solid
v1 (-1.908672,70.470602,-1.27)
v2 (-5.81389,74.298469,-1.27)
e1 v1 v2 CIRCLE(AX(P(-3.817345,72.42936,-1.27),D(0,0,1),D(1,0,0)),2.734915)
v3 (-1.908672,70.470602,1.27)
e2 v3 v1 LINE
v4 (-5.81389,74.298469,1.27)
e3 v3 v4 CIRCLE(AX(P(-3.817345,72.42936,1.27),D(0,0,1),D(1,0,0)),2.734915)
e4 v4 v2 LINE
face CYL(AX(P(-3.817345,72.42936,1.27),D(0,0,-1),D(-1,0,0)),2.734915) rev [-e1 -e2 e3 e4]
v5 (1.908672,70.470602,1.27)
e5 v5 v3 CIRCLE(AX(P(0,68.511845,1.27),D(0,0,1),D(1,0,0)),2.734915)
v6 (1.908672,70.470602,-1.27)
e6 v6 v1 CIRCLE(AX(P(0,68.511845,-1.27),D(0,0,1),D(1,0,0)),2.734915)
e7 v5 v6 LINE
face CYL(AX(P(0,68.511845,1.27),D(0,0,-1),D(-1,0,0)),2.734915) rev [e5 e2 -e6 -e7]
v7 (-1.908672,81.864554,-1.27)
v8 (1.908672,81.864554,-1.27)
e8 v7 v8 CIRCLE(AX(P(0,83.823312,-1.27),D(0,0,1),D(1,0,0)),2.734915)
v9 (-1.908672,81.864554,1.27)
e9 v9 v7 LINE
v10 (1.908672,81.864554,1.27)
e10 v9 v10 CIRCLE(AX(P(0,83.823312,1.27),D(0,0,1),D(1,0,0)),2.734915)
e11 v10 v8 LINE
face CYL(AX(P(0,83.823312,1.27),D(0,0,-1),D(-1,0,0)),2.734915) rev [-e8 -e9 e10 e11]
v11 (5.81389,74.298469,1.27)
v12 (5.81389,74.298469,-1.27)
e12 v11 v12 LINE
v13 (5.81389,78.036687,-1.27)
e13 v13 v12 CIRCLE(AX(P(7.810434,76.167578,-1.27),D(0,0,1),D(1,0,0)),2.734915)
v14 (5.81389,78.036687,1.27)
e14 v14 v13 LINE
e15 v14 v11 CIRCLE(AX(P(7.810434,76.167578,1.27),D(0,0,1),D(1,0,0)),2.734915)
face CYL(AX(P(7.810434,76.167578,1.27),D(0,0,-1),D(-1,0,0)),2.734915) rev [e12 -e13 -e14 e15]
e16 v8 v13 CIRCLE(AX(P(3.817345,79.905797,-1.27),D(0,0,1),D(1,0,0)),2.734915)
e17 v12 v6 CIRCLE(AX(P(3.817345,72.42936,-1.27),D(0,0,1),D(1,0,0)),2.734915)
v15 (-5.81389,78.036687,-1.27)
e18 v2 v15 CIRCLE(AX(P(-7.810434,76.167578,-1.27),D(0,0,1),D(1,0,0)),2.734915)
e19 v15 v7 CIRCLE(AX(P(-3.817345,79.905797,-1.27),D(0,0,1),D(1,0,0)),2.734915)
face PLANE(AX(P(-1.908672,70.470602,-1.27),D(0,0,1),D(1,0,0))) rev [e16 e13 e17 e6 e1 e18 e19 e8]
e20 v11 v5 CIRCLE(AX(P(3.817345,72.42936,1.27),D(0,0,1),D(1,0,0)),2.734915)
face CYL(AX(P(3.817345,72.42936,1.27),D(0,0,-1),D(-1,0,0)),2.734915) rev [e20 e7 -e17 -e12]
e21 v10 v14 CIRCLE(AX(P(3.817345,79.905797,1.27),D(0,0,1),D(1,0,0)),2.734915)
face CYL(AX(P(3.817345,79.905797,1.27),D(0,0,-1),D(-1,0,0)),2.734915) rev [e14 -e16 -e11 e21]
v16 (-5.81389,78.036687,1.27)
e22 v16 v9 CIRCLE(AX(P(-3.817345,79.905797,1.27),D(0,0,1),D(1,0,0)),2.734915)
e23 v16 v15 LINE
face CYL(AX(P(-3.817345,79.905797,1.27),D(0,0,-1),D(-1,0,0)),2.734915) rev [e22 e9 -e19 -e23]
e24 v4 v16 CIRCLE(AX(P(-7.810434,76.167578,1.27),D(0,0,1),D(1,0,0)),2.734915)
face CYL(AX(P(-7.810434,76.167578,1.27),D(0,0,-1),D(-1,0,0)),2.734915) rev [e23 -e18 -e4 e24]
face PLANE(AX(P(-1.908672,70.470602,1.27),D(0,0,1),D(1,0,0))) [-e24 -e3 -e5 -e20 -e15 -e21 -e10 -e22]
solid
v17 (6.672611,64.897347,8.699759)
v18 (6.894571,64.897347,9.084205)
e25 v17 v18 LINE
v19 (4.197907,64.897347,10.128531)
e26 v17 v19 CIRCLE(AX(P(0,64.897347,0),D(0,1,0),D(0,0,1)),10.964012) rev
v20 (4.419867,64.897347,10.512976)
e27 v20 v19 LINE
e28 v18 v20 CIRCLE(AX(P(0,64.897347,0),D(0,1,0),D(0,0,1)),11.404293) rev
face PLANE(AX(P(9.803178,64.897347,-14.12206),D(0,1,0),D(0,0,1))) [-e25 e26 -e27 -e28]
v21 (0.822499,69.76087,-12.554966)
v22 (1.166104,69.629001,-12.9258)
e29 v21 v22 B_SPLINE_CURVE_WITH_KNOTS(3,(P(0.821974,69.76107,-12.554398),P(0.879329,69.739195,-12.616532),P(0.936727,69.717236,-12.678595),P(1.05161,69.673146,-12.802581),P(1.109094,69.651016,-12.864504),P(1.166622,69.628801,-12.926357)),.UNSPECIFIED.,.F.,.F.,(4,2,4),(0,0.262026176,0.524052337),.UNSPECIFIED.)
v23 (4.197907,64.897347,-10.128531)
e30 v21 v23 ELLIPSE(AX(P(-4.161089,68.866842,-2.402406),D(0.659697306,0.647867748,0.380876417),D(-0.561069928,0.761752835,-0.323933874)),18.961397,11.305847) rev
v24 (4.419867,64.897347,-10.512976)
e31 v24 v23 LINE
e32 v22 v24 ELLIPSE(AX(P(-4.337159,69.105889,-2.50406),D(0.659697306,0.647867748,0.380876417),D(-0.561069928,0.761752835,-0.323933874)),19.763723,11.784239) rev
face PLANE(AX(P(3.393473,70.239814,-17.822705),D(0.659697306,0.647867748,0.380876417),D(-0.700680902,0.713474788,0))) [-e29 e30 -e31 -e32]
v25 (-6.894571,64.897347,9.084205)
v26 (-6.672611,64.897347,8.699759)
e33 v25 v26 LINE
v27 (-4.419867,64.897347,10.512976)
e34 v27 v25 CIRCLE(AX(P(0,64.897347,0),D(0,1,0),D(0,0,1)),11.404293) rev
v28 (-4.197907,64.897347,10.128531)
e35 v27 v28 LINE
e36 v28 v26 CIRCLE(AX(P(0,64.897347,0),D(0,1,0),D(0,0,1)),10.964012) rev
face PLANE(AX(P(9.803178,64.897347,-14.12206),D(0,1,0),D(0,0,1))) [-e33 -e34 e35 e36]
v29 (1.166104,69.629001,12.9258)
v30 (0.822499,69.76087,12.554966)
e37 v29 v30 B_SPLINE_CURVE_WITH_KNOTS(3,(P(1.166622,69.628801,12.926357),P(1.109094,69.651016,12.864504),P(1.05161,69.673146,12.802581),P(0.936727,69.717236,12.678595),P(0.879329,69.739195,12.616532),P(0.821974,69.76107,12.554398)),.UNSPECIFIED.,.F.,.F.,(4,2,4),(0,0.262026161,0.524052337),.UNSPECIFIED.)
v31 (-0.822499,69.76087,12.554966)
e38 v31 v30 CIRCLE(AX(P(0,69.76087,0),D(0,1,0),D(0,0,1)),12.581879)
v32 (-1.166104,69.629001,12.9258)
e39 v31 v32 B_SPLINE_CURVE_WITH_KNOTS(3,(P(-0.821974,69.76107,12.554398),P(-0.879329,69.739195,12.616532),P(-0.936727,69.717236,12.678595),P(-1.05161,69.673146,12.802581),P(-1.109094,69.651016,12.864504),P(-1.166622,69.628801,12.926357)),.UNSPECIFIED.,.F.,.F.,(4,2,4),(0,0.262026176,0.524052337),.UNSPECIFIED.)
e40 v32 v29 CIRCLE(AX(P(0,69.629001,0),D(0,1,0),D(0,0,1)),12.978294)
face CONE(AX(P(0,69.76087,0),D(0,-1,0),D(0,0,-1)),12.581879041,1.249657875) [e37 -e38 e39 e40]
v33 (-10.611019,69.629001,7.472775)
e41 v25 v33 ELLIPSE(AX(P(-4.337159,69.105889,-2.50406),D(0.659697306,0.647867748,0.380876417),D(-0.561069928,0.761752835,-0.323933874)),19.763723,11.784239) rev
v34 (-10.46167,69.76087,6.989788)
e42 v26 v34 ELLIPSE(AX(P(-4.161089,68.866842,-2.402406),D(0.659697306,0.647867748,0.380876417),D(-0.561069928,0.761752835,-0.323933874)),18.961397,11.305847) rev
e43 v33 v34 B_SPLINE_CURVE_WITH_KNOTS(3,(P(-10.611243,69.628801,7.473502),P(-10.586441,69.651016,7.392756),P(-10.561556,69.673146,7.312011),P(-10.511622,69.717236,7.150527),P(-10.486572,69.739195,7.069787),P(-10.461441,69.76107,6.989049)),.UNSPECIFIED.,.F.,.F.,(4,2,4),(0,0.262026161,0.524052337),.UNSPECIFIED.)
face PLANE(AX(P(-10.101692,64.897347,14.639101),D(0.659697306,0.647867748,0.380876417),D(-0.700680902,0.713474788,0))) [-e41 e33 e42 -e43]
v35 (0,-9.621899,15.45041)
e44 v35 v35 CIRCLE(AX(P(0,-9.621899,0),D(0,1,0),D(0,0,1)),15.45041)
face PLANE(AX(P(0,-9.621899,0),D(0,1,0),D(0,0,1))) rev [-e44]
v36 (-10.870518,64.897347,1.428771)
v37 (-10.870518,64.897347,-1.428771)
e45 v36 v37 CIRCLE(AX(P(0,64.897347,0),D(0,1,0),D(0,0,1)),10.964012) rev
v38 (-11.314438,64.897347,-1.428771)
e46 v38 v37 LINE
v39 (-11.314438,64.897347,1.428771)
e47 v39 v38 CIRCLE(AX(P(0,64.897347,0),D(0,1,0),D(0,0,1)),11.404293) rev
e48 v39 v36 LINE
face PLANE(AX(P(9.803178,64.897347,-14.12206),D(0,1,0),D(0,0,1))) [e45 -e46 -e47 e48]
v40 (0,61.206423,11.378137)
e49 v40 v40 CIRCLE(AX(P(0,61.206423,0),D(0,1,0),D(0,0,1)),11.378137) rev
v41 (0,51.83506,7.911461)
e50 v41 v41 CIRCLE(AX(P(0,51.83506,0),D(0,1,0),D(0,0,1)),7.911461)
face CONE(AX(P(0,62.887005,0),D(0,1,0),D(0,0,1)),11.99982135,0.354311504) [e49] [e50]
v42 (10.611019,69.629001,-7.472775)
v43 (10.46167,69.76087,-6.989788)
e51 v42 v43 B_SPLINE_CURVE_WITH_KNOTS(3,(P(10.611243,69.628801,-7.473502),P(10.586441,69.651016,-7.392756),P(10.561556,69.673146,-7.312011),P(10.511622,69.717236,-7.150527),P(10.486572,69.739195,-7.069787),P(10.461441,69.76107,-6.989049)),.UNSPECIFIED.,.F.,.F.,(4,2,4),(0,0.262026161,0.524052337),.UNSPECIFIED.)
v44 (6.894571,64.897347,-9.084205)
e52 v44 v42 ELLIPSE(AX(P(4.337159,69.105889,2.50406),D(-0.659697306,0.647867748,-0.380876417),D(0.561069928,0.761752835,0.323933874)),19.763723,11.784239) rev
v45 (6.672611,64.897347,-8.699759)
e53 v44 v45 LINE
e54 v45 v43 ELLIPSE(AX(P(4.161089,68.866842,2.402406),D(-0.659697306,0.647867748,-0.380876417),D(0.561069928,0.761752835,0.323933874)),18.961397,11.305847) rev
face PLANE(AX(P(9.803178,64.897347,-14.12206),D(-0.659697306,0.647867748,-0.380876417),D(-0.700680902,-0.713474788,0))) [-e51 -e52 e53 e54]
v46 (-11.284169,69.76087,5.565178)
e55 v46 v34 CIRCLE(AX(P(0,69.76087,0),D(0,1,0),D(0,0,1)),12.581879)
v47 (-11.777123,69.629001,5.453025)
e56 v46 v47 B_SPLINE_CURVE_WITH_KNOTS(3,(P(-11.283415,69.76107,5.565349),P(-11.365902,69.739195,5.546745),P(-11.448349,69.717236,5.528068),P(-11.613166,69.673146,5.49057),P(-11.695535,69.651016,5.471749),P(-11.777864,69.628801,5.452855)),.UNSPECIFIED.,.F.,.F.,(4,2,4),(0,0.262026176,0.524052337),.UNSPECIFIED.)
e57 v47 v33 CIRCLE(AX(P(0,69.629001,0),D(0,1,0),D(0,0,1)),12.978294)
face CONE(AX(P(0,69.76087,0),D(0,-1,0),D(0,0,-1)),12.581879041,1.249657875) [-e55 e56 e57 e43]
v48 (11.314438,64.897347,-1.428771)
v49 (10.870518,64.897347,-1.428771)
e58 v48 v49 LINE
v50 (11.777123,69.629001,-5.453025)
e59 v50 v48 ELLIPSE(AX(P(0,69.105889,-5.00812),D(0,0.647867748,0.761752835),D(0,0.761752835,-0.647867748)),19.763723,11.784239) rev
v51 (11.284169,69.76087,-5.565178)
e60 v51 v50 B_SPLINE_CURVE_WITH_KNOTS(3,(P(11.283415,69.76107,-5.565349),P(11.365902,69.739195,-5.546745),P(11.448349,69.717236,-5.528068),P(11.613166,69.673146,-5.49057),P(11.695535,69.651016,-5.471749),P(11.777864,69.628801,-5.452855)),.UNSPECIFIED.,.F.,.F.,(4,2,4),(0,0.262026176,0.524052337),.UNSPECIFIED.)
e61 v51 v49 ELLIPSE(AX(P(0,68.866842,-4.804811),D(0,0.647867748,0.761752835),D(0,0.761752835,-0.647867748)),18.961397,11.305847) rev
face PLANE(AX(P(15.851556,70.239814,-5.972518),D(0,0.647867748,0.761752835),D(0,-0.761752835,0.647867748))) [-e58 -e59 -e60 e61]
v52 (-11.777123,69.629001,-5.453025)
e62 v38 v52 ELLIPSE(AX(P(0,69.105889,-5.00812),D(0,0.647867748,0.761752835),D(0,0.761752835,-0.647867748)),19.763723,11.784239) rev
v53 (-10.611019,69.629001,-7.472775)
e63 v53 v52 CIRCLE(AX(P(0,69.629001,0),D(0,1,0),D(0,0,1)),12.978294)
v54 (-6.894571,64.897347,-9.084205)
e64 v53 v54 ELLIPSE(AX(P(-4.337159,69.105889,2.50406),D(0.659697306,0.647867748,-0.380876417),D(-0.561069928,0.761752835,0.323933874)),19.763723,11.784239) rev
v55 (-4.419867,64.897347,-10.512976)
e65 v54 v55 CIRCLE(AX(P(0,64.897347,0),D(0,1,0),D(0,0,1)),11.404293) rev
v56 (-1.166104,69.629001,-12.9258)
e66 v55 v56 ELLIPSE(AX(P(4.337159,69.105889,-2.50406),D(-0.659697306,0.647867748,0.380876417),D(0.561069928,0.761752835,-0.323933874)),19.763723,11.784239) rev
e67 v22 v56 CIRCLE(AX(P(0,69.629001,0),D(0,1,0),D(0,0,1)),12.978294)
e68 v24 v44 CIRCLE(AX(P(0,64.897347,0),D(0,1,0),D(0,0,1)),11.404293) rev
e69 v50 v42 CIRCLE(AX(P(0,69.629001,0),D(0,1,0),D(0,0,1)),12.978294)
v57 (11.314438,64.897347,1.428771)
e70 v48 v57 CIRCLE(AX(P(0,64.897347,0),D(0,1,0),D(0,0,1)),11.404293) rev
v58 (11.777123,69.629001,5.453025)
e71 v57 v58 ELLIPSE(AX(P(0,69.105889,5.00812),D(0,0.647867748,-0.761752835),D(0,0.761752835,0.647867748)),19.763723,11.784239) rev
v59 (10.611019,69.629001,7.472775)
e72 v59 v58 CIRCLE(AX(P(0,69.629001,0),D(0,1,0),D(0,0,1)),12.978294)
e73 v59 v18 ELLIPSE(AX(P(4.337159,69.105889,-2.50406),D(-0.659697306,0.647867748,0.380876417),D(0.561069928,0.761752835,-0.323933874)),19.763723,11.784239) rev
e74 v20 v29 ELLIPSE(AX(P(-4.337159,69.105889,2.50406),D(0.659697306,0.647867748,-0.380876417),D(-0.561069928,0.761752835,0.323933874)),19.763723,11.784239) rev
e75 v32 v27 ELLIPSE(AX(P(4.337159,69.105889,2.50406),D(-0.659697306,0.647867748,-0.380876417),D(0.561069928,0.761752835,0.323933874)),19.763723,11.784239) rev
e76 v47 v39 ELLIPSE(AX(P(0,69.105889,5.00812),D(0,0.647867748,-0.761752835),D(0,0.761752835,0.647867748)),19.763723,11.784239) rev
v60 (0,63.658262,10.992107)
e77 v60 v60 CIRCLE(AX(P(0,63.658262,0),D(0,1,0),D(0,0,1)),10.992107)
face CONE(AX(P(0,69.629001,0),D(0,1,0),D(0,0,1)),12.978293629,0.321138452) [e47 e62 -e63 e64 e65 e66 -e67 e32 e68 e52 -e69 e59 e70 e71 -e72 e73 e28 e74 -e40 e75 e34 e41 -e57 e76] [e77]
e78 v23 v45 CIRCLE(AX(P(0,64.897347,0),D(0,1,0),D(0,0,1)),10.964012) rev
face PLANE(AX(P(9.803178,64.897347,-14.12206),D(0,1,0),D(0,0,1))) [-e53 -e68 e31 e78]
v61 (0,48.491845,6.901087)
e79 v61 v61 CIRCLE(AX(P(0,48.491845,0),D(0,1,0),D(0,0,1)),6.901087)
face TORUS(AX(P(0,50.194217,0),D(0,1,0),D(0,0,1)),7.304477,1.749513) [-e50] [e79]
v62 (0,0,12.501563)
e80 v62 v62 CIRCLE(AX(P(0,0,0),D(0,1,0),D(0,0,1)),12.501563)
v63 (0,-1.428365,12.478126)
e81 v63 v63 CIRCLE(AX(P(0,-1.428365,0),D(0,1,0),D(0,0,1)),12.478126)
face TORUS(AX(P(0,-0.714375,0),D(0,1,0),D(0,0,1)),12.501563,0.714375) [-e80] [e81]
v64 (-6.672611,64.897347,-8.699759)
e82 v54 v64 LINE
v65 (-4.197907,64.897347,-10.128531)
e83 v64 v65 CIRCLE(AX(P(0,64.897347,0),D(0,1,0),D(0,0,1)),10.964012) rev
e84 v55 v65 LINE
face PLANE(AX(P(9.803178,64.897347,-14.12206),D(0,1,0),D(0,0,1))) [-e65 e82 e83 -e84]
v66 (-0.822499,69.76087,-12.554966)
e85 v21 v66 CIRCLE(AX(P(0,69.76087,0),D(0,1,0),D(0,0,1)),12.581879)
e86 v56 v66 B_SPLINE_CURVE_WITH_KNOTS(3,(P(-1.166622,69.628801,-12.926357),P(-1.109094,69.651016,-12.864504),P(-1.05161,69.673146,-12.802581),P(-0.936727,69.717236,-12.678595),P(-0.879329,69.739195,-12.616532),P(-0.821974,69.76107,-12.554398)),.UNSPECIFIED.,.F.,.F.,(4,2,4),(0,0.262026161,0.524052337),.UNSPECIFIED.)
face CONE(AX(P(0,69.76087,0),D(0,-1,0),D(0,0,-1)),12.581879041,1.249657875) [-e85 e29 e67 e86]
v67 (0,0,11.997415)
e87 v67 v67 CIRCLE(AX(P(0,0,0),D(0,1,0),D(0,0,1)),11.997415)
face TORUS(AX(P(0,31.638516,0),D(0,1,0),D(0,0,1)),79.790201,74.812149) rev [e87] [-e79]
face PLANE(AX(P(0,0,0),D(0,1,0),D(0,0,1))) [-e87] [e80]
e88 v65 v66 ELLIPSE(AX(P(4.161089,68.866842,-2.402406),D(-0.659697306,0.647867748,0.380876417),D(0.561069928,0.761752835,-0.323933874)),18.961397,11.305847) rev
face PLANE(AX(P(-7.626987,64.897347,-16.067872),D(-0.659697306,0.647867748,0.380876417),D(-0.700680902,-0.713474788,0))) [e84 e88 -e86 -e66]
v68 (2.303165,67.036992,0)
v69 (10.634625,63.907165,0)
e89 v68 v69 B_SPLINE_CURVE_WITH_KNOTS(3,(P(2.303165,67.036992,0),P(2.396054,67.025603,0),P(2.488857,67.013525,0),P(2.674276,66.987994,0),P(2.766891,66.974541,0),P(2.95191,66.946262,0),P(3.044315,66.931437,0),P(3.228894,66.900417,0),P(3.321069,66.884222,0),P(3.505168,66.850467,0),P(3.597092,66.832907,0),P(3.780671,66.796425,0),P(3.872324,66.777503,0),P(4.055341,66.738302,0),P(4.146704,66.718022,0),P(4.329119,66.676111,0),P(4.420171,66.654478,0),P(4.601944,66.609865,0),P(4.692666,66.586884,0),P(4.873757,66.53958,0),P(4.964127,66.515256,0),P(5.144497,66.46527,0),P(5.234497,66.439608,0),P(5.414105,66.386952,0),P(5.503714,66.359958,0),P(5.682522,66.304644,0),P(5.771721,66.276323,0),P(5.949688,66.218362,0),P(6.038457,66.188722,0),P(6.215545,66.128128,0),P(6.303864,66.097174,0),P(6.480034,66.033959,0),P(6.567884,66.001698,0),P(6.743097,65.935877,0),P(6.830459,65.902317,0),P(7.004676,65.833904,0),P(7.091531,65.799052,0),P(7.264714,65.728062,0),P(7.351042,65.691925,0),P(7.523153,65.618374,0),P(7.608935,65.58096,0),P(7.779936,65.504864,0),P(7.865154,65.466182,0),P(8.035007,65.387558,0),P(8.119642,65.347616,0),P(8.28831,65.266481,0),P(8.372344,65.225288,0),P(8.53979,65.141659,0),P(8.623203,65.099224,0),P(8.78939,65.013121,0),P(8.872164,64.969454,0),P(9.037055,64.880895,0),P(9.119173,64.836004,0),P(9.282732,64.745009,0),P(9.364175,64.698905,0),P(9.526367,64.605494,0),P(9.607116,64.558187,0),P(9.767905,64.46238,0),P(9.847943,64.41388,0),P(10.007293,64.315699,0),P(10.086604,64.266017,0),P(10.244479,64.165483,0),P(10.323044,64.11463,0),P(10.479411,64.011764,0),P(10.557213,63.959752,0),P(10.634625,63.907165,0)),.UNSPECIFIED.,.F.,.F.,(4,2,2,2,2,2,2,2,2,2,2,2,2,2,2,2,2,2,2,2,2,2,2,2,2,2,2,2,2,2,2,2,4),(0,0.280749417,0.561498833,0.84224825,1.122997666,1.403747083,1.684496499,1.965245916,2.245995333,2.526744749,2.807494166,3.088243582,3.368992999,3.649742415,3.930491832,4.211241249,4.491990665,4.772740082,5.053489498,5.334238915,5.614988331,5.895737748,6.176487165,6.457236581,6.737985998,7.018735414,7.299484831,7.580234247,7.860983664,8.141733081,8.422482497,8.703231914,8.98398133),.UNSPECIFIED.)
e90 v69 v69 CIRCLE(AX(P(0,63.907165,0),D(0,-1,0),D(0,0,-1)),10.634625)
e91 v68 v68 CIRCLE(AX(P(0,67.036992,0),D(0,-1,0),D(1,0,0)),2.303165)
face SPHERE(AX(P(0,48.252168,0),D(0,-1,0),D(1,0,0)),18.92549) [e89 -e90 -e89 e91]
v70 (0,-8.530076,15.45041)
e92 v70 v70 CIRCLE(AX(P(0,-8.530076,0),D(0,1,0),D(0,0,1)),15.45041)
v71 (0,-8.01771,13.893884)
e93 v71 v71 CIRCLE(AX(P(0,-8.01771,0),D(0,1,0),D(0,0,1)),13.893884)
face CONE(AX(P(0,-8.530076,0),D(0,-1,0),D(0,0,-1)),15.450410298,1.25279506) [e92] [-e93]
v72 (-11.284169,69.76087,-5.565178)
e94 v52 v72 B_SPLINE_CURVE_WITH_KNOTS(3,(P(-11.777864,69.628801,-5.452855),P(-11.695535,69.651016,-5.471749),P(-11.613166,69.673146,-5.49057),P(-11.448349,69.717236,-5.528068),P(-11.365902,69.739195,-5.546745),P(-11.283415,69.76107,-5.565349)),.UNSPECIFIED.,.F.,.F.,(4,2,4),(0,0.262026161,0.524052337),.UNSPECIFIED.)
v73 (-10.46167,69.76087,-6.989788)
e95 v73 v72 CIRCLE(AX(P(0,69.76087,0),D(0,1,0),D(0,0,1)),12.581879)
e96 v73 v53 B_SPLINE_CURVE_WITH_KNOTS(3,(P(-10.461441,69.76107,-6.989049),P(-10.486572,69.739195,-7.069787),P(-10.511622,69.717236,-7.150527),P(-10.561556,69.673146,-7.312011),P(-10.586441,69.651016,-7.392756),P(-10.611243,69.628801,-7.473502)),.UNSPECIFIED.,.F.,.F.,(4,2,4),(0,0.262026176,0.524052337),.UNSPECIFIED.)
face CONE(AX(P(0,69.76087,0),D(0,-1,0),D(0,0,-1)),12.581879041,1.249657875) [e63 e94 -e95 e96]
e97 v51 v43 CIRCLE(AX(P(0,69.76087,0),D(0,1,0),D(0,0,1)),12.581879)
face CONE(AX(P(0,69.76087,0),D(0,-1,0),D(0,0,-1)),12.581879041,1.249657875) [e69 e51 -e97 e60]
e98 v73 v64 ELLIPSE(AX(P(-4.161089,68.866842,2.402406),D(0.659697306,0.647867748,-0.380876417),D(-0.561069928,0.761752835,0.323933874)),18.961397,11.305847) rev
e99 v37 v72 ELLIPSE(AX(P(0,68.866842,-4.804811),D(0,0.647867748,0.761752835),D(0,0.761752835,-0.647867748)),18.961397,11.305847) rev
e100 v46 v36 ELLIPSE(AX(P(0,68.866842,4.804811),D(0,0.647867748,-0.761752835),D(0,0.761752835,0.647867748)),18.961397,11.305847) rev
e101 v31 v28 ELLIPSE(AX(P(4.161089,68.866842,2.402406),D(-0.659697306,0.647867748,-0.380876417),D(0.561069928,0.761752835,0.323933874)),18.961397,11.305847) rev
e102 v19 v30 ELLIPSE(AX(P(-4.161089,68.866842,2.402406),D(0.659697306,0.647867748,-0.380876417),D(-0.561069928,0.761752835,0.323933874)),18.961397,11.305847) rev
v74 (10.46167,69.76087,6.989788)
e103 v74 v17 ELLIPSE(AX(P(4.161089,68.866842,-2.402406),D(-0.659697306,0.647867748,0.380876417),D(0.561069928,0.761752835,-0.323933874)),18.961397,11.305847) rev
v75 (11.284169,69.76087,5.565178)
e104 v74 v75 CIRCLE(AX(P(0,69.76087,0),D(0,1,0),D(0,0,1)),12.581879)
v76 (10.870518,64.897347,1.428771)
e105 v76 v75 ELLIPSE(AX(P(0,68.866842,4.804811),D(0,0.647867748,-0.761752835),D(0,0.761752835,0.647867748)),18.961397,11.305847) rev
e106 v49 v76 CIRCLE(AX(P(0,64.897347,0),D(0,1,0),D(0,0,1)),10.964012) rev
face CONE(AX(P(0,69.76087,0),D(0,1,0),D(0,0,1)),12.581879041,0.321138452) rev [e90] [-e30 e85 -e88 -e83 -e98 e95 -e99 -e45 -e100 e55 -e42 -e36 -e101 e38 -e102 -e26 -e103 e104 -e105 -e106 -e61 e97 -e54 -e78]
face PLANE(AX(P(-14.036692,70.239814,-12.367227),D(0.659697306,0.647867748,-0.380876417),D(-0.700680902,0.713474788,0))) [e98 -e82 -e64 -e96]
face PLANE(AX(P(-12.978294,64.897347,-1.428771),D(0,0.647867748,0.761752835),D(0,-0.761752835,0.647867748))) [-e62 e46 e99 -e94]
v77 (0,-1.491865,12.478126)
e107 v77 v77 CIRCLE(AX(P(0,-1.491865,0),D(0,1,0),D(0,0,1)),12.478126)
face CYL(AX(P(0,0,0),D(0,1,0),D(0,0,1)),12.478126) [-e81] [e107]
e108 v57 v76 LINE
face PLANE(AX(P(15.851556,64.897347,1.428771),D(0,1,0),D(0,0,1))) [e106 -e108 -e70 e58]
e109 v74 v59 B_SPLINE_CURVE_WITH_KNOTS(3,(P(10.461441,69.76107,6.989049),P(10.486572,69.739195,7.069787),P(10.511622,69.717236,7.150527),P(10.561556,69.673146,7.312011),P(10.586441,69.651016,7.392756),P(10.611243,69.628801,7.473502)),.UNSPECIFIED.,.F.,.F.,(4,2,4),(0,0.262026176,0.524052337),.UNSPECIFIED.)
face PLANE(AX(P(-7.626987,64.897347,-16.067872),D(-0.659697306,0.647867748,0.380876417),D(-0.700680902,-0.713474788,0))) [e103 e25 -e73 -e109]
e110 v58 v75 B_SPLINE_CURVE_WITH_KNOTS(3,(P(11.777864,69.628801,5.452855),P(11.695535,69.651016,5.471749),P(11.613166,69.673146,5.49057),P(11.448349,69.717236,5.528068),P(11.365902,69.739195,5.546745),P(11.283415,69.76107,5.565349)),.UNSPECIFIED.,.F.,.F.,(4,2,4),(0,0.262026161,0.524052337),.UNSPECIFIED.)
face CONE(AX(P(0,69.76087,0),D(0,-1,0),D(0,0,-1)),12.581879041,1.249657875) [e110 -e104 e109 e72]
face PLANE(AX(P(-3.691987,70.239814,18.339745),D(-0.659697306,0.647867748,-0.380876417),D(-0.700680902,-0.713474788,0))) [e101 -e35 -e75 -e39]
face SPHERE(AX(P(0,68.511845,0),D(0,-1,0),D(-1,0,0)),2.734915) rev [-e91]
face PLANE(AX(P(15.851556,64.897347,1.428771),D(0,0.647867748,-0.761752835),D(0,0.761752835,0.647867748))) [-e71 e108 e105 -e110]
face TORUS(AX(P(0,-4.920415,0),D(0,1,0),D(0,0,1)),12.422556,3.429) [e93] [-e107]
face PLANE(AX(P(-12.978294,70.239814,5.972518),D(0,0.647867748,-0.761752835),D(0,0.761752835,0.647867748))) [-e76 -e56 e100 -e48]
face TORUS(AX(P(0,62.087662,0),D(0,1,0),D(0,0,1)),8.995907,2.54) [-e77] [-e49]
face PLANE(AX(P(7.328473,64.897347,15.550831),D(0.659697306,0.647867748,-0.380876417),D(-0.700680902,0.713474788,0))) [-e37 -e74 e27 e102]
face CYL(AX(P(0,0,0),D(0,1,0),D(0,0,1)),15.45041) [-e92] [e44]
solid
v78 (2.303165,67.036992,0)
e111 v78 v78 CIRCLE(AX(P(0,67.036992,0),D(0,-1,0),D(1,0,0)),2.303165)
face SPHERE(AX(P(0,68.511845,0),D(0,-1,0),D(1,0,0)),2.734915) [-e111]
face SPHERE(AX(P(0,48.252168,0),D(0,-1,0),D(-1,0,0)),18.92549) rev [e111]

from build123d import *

# Parameters (mm, degrees)
CUT_EXTRUDE2_DEPTH  = 74.274296975
CIRPATTERN1_COUNT   = 6
BOSS_EXTRUDE2_DEPTH = 1.27
FILLET2_R           = 2.54


with BuildPart() as part:
    # Sketch1 → Revolve1 (revolve)
    with BuildSketch(Plane.XY, mode=Mode.PRIVATE) as revolve1_sk:
        with BuildLine():
            Line((0, 62.887005158), (0, -9.621899222))
            Line((0, -9.621899222), (15.450410298, -9.621899222))
            Line((15.450410298, -9.621899222), (15.450410298, -8.530075969))
            Line((15.450410298, -8.530075969), (13.893883706, -8.017710004))
            ThreePointArc((13.893883706, -8.017710004), (15.773602868, -4.193417719), (12.478125528, -1.49186544))
            Line((12.478125528, -1.49186544), (12.478125528, -1.42836544))
            ThreePointArc((12.478125528, -1.42836544), (13.215841354, -0.726095063), (12.5015625, 0))
            Line((12.5015625, 0), (11.997414701, 0))
            ThreePointArc((11.997414701, 0), (5.387821929, 23.819079982), (6.901087077, 48.49184465))
            ThreePointArc((6.901087077, 48.49184465), (8.979181431, 49.688094116), (7.911461263, 51.835060015))
            Line((7.911461263, 51.835060015), (11.99982135, 62.887005158))
            Line((11.99982135, 62.887005158), (0, 62.887005158))
        make_face()
        with BuildLine():
            ThreePointArc((10.634624536, 63.907165059), (10.814082096, 63.783742301), (10.992107389, 63.658262472))
            Line((10.992107389, 63.658262472), (12.978293629, 69.629001059))
            Line((12.978293629, 69.629001059), (12.581879041, 69.760869703))
            Line((12.581879041, 69.760869703), (10.634624536, 63.907165059))
        make_face()
    revolve(revolve1_sk.sketch.rotate(Axis((0, 0, 0), (0, -1, 0)), 90), axis=Axis((0, 0, 0), (0, -1, 0)))

    # Sketch8 → Cut-Extrude2 (cut, through all)
    with BuildSketch(Plane(origin=(0, 0, 0), x_dir=(0, 0, -1), z_dir=(1, 0, 0))):
        Polygon((-1.428771389, 64.897346506), (1.428771389, 64.897346506), (5.972518416, 70.239813687), (-5.972518416, 70.239813687), align=None)
    cut_extrude2 = extrude(amount=CUT_EXTRUDE2_DEPTH, mode=Mode.SUBTRACT)

    # CirPattern1: Cut-Extrude2 ×6 about axis
    cirpattern1_axis = Axis((0, 0, 0), (0, 1, 0))
    for i in range(1, CIRPATTERN1_COUNT):
        add(cut_extrude2.rotate(cirpattern1_axis, i * 360 / CIRPATTERN1_COUNT), mode=Mode.SUBTRACT)

    # Sketch1<10> one side → Revolve2 (revolve)
    with BuildSketch(Plane.XY, mode=Mode.PRIVATE) as revolve2_sk:
        with BuildLine():
            Line((0, 71.246759945), (0, 67.177658079))
            ThreePointArc((0, 67.177658079), (1.153728364, 67.142458775), (2.303165116, 67.036991796))
            ThreePointArc((2.303165116, 67.036991796), (2.399308099, 69.824506799), (0, 71.246759945))
        make_face()
        with BuildLine():
            Line((0, 65.776929635), (0, 62.887005158))
            Line((0, 62.887005158), (11.99982135, 62.887005158))
            ThreePointArc((11.99982135, 62.887005158), (7.44643893, 65.651154197), (2.303165116, 67.036991796))
            ThreePointArc((2.303165116, 67.036991796), (1.312662009, 66.112536691), (0, 65.776929635))
        make_face()
    revolve(revolve2_sk.sketch.rotate(Axis((0, 67.177658079, 0), (0, 1, 0)), 266.251805894), axis=Axis((0, 67.177658079, 0), (0, 1, 0)))

    # Fillet2
    # the kernel refuses this fillet: 2.54 mm, written as the material it takes off along each edge
    with BuildSketch(Plane(origin=(0, 62.887005158, 0), x_dir=(0, 0, 1), z_dir=(1, 0, 0))) as fillet2_piece_1:
        with BuildLine():
            CenterArc((8.995907198, 0.799342826), FILLET2_R, 321.804511732, 58.496042059)
            Line((10.992107389, -0.771257314), (11.032031393, -0.802669316))
            ThreePointArc((11.032031393, -0.802669316), (11.533305395, -0.434417916), (12.032031398, -0.039282984))
            Line((12.032031398, -0.039282984), (12.047465937, 0.017624792))
            Line((12.047465937, 0.017624792), (11.425781162, 1.698207198))
            Line((11.425781162, 1.698207198), (11.378136575, 1.680582406))
        make_face()
    revolve(axis=Axis((0, 62.887005158, 0), (0, -1, 0)), revolution_arc=3.748194106, mode=Mode.SUBTRACT)
    with BuildSketch(Plane(origin=(0, 62.887005158, 0), x_dir=(-0.06537167788558164, 0, 0.9978609841708531), z_dir=(0.9978609841708531, 0, 0.06537167788558164))) as fillet2_piece_2:
        with BuildLine():
            CenterArc((8.995907198, 0.799342826), FILLET2_R, 321.804511732, 58.496042059)
            Line((10.992107389, -0.771257314), (11.032031393, -0.802669316))
            ThreePointArc((11.032031393, -0.802669316), (11.533305395, -0.434417916), (12.032031398, -0.039282984))
            Line((12.032031398, -0.039282984), (12.047465937, 0.017624792))
            Line((12.047465937, 0.017624792), (11.425781162, 1.698207198))
            Line((11.425781162, 1.698207198), (11.378136575, 1.680582406))
        make_face()
    revolve(axis=Axis((0, 62.887005158, 0), (0, -1, 0)), revolution_arc=356.251805894, mode=Mode.SUBTRACT)


with BuildPart() as body_2:
    # Sketch1<11> → Boss-Extrude2 (new, symmetric)
    with BuildSketch(Plane.XY):
        with BuildLine():
            ThreePointArc((5.813889583, 78.036687482), (5.075519313, 76.167578222), (5.813889583, 74.298468961))
            ThreePointArc((5.813889583, 74.298468961), (1.902907105, 74.382482742), (1.908672349, 70.470602246))
            ThreePointArc((1.908672349, 70.470602246), (0, 71.246759945), (-1.908672349, 70.470602246))
            ThreePointArc((-1.908672349, 70.470602246), (-1.902907105, 74.382482742), (-5.813889583, 74.298468961))
            ThreePointArc((-5.813889583, 74.298468961), (-5.075519313, 76.167578222), (-5.813889583, 78.036687482))
            ThreePointArc((-5.813889583, 78.036687482), (-1.902907105, 77.952673702), (-1.908672349, 81.864554198))
            ThreePointArc((-1.908672349, 81.864554198), (0, 81.088396498), (1.908672349, 81.864554198))
            ThreePointArc((1.908672349, 81.864554198), (1.902907105, 77.952673702), (5.813889583, 78.036687482))
        make_face()
    extrude(amount=BOSS_EXTRUDE2_DEPTH, both=True)


solid = Compound([part.part, body_2.part])
